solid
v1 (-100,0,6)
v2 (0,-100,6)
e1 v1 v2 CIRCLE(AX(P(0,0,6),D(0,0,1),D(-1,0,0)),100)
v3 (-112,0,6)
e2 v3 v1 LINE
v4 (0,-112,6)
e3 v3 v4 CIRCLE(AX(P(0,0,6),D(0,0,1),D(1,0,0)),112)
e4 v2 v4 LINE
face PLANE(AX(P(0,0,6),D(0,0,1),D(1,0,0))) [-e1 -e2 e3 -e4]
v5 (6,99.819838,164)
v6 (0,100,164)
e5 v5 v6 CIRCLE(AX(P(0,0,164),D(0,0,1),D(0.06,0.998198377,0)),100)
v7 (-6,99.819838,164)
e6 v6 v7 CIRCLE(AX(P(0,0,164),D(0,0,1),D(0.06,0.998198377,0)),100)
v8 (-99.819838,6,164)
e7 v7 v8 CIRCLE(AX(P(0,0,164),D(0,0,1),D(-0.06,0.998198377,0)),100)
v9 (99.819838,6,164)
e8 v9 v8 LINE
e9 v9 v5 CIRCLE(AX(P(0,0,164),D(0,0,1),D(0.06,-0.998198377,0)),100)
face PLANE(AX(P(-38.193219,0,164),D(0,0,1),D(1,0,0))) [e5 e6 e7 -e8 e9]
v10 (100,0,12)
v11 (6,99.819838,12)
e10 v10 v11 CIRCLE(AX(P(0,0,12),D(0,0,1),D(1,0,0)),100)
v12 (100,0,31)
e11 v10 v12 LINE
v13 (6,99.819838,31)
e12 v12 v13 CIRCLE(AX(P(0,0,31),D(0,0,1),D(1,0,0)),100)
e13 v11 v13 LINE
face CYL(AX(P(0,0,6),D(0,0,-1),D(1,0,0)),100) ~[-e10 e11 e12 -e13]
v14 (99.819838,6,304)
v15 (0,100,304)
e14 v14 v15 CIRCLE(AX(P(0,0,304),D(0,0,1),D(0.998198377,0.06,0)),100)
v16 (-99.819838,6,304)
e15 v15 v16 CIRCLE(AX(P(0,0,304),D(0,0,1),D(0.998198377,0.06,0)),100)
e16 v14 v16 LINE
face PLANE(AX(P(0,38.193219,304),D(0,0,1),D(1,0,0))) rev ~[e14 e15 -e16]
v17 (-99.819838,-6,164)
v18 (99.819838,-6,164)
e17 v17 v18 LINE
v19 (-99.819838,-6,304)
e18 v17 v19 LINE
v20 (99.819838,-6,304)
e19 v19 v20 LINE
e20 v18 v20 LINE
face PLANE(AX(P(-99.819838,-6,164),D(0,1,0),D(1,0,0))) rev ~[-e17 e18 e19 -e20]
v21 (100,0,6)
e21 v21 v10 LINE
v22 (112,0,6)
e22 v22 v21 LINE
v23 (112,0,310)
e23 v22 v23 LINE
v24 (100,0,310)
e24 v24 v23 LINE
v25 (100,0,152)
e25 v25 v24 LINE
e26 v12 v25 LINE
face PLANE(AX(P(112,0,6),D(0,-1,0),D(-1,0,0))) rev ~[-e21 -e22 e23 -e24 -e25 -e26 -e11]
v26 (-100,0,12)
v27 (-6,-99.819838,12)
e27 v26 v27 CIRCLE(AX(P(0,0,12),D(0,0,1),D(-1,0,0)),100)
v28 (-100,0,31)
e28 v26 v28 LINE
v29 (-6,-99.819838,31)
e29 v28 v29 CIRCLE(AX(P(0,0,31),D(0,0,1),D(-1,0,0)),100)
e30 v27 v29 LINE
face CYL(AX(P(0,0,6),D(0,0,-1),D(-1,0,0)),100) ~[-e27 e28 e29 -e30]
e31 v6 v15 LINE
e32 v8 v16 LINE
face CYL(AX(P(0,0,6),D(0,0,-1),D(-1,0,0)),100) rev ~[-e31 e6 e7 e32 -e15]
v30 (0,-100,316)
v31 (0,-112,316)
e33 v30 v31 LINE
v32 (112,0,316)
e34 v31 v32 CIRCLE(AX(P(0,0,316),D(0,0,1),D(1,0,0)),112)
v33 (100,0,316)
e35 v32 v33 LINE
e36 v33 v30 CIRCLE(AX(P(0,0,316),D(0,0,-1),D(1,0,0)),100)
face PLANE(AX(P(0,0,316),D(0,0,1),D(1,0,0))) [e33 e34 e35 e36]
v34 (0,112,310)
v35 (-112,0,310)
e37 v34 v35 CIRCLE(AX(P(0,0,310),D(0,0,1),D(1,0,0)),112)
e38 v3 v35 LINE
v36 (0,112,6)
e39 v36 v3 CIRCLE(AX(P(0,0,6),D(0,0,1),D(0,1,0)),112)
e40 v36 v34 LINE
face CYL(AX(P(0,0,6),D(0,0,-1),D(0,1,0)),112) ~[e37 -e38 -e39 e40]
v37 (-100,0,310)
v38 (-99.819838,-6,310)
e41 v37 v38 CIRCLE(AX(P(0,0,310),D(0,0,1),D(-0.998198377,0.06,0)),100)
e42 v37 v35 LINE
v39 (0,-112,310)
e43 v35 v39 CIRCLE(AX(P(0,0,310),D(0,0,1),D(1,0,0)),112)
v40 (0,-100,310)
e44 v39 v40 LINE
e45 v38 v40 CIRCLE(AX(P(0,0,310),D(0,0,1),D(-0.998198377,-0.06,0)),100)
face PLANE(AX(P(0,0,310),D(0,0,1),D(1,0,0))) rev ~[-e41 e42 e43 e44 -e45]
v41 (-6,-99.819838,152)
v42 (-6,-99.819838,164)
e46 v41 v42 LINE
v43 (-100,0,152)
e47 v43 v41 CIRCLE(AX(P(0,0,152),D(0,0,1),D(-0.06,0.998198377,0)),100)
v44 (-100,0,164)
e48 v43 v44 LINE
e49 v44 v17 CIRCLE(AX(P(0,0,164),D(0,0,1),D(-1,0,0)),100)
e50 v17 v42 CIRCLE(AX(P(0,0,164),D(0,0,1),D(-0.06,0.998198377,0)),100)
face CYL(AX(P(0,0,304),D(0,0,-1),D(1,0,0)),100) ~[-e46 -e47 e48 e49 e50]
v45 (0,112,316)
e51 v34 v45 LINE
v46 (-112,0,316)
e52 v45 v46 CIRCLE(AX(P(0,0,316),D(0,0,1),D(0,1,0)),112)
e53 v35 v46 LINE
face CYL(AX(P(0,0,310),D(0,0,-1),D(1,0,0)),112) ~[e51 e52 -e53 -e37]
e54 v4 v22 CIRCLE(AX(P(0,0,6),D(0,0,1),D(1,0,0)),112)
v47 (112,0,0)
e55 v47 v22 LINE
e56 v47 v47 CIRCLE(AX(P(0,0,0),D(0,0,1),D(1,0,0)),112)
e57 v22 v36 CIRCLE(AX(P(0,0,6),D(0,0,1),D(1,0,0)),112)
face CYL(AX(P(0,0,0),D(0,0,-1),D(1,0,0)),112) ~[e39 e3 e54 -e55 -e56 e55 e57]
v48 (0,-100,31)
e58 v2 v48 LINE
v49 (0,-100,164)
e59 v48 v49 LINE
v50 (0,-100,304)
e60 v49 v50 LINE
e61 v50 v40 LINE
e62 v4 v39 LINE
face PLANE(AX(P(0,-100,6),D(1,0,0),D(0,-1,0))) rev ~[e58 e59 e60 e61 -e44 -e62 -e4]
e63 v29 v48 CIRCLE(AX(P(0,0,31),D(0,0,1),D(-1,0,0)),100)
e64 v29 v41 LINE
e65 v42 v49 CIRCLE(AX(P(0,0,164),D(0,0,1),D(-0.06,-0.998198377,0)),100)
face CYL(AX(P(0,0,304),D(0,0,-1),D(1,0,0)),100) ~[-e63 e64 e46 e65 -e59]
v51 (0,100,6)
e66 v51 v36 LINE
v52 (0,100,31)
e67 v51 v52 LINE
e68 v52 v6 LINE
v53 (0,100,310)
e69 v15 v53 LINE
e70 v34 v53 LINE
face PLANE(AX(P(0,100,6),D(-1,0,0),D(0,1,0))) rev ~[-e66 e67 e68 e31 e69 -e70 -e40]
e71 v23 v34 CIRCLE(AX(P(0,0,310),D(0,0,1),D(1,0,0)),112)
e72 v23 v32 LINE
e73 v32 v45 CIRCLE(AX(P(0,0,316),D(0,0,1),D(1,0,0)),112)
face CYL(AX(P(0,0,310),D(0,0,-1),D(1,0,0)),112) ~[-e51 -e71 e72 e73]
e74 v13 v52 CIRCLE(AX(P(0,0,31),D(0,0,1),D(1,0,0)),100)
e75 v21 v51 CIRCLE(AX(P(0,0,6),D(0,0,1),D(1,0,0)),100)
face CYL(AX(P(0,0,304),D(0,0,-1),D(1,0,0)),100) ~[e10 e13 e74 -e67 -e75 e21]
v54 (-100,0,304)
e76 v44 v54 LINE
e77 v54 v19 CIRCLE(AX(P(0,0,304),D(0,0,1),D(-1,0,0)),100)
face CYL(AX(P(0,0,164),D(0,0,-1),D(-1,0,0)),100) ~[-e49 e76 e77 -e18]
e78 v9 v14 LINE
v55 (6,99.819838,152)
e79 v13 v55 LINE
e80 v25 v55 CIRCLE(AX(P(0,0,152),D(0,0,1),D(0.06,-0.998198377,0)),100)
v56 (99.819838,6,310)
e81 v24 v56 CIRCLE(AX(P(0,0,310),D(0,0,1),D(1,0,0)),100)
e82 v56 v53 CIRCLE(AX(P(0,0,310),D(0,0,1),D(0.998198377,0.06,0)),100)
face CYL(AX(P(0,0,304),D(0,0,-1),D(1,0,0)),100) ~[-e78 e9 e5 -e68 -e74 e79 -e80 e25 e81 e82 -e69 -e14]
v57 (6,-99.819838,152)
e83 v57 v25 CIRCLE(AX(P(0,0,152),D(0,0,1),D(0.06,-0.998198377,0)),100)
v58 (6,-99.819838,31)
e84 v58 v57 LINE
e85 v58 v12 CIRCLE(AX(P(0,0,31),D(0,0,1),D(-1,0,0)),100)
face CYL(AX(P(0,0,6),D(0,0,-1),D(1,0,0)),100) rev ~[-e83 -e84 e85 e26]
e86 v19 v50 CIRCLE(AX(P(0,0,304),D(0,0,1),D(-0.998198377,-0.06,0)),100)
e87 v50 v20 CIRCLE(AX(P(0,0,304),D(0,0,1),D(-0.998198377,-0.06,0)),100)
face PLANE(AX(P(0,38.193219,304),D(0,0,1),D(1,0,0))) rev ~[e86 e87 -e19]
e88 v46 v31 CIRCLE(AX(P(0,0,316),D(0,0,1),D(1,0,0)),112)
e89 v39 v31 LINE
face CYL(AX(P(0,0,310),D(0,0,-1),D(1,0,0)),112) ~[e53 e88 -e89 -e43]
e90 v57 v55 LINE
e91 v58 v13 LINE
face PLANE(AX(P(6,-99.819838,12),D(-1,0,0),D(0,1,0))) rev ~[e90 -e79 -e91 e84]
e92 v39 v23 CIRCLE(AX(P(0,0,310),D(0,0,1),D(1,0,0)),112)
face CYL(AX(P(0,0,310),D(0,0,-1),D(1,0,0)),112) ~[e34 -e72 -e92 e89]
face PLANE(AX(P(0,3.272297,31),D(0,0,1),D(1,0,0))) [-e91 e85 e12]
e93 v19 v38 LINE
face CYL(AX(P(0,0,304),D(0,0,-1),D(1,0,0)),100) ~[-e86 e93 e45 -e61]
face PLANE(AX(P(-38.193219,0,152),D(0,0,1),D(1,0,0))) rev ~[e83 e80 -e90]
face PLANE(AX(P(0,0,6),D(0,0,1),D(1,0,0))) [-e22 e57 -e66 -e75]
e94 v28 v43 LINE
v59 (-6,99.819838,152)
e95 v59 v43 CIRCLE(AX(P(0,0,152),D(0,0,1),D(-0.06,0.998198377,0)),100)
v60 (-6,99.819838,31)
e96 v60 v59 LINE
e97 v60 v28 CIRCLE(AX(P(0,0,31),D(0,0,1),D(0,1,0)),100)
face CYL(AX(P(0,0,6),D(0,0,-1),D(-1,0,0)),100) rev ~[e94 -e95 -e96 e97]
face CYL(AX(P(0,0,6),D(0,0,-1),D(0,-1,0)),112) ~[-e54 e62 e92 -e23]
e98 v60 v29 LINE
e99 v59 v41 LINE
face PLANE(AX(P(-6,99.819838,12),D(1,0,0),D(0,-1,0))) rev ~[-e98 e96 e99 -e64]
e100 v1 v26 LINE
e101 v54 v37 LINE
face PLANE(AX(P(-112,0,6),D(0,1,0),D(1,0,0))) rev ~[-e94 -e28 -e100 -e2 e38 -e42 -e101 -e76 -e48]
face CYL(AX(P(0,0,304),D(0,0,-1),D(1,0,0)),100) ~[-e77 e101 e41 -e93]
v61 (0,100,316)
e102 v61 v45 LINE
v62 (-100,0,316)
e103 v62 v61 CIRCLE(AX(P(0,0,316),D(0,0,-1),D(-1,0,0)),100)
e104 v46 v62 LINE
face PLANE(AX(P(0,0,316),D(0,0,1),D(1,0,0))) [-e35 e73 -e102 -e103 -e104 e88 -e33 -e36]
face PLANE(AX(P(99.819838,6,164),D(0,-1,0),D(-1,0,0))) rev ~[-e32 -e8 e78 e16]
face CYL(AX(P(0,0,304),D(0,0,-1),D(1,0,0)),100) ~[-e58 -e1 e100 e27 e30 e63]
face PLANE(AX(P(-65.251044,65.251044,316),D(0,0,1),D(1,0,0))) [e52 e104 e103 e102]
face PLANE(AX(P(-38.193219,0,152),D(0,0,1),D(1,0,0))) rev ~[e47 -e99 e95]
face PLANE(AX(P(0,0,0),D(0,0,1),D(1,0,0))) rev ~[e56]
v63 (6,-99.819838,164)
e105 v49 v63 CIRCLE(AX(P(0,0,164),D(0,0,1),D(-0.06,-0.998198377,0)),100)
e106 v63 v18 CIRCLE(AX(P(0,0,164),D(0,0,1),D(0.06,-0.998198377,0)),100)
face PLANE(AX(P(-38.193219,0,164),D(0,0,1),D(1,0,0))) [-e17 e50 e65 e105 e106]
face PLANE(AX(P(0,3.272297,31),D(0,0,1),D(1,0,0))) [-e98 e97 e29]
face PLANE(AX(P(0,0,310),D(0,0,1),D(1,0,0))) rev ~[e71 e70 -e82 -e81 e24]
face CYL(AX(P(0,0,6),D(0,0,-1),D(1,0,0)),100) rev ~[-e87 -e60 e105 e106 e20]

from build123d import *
from build123d import SkipClean  # not in build123d's __all__

# Parameters (mm, degrees)
F0_R      = 112
F1_DEPTH  = 6
F3_DEPTH  = 6
F5_DEPTH  = 140
F7_DEPTH  = 12
F9_DEPTH  = 140
F11_DEPTH = 6
F12_R     = 112
F12_R_2   = 100
F13_DEPTH = 6
F14_DEPTH = 25
F16_DEPTH = 310


with BuildPart() as f1:
    # F0 (on Top) → F1 (new body)
    with BuildSketch(Plane.XY):
        Circle(F0_R)
    extrude(amount=F1_DEPTH)

    # F2 (on face) → F3 (join)
    with BuildSketch(Plane.XY.offset(6)):
        with BuildLine():
            ThreePointArc((-100, 0), (0, -100), (100, 0))
            ThreePointArc((100, 0), (70.7106781187, 70.7106781187), (0, 100))
            ThreePointArc((0, 100), (-70.7106781187, 70.7106781187), (-100, 0))
        make_face()
    extrude(amount=F3_DEPTH)

    # F4 (on face) → F5 (join)
    with BuildSketch(Plane.XY.offset(12)):
        with BuildLine():
            ThreePointArc((6, 99.8198377077), (3.0013521308, 99.9549492791), (0, 100))
            ThreePointArc((0, 100), (-3.0013521308, 99.9549492791), (-6, 99.8198377077))
            Line((-6, 99.8198377077), (-6, -99.8198377077))
            ThreePointArc((-6, -99.8198377077), (-3.0013521308, -99.9549492791), (0, -100))
            ThreePointArc((0, -100), (3.0013521308, -99.9549492791), (6, -99.8198377077))
            Line((6, -99.8198377077), (6, 99.8198377077))
        make_face()
    extrude(amount=F5_DEPTH)

    # F6 (on face) → F7 (join)
    with BuildSketch(Plane.XY.offset(152)):
        with BuildLine():
            Line((-6, -99.8198377077), (-6, 99.8198377077))
            ThreePointArc((-6, 99.8198377077), (-100, 0), (-6, -99.8198377077))
        make_face()
        with BuildLine():
            Line((6, -99.8198377077), (6, 99.8198377077))
            ThreePointArc((6, 99.8198377077), (0, 100), (-6, 99.8198377077))
            Line((-6, 99.8198377077), (-6, -99.8198377077))
            ThreePointArc((-6, -99.8198377077), (0, -100), (6, -99.8198377077))
        make_face()
        with BuildLine():
            ThreePointArc((6, -99.8198377077), (72.8010988928, -68.556546004), (100, 0))
            ThreePointArc((100, 0), (72.8010988928, 68.556546004), (6, 99.8198377077))
            Line((6, 99.8198377077), (6, -99.8198377077))
        make_face()
    extrude(amount=F7_DEPTH)

    # F8 (on face) → F9 (join)
    with BuildSketch(Plane.XY.offset(164)):
        with BuildLine():
            Line((99.8198377077, 6), (-99.8198377077, 6))
            ThreePointArc((-99.8198377077, 6), (-99.9549492791, 3.0013521308), (-100, 0))
            ThreePointArc((-100, 0), (-99.9549492791, -3.0013521308), (-99.8198377077, -6))
            Line((-99.8198377077, -6), (99.8198377077, -6))
            ThreePointArc((99.8198377077, -6), (99.9549492791, -3.0013521308), (100, 0))
            ThreePointArc((100, 0), (99.9549492791, 3.0013521308), (99.8198377077, 6))
        make_face()
    extrude(amount=F9_DEPTH)

    # F10 (on face) → F11 (join)
    with BuildSketch(Plane.XY.offset(304)):
        with BuildLine():
            Line((-99.8198377077, 6), (99.8198377077, 6))
            ThreePointArc((99.8198377077, 6), (0, 100), (-99.8198377077, 6))
        make_face()
        with BuildLine():
            ThreePointArc((99.8198377077, -6), (99.9549492791, -3.0013521308), (100, 0))
            ThreePointArc((100, 0), (99.9549492791, 3.0013521308), (99.8198377077, 6))
            Line((99.8198377077, 6), (-99.8198377077, 6))
            ThreePointArc((-99.8198377077, 6), (-100, 0), (-99.8198377077, -6))
            Line((-99.8198377077, -6), (99.8198377077, -6))
        make_face()
        with BuildLine():
            ThreePointArc((-99.8198377077, -6), (0, -100), (99.8198377077, -6))
            Line((99.8198377077, -6), (-99.8198377077, -6))
        make_face()
    extrude(amount=F11_DEPTH)

    # F12 (on face) → F13 (join)
    with BuildSketch(Plane.XY.offset(310)):
        Circle(F12_R)
        Circle(F12_R_2, mode=Mode.SUBTRACT)
        Circle(F12_R_2)
    extrude(amount=F13_DEPTH)

    # F2 (on face) → F14 (join)
    with BuildSketch(Plane.XY.offset(6)):
        with BuildLine():
            ThreePointArc((-100, 0), (0, -100), (100, 0))
            ThreePointArc((100, 0), (70.7106781187, 70.7106781187), (0, 100))
            ThreePointArc((0, 100), (-70.7106781187, 70.7106781187), (-100, 0))
        make_face()
    with SkipClean():  # cleaning this boolean's faces spoils the solid; the shape is the same uncleaned
        extrude(amount=F14_DEPTH)

    # F15 (on face) → F16 (join)
    with BuildSketch(Plane.XY.offset(6)):
        with BuildLine():
            Line((0, 100), (0, 112))
            ThreePointArc((0, 112), (-79.1959594929, 79.1959594929), (-112, 0))
            Line((-112, 0), (-100, 0))
            ThreePointArc((-100, 0), (-70.7106781187, 70.7106781187), (0, 100))
        make_face()
        with BuildLine():
            ThreePointArc((0, -112), (79.1959594929, -79.1959594929), (112, 0))
            Line((112, 0), (100, 0))
            ThreePointArc((100, 0), (70.7106781187, -70.7106781187), (0, -100))
            Line((0, -100), (0, -112))
        make_face()
    extrude(amount=F16_DEPTH)


solid = f1.part
